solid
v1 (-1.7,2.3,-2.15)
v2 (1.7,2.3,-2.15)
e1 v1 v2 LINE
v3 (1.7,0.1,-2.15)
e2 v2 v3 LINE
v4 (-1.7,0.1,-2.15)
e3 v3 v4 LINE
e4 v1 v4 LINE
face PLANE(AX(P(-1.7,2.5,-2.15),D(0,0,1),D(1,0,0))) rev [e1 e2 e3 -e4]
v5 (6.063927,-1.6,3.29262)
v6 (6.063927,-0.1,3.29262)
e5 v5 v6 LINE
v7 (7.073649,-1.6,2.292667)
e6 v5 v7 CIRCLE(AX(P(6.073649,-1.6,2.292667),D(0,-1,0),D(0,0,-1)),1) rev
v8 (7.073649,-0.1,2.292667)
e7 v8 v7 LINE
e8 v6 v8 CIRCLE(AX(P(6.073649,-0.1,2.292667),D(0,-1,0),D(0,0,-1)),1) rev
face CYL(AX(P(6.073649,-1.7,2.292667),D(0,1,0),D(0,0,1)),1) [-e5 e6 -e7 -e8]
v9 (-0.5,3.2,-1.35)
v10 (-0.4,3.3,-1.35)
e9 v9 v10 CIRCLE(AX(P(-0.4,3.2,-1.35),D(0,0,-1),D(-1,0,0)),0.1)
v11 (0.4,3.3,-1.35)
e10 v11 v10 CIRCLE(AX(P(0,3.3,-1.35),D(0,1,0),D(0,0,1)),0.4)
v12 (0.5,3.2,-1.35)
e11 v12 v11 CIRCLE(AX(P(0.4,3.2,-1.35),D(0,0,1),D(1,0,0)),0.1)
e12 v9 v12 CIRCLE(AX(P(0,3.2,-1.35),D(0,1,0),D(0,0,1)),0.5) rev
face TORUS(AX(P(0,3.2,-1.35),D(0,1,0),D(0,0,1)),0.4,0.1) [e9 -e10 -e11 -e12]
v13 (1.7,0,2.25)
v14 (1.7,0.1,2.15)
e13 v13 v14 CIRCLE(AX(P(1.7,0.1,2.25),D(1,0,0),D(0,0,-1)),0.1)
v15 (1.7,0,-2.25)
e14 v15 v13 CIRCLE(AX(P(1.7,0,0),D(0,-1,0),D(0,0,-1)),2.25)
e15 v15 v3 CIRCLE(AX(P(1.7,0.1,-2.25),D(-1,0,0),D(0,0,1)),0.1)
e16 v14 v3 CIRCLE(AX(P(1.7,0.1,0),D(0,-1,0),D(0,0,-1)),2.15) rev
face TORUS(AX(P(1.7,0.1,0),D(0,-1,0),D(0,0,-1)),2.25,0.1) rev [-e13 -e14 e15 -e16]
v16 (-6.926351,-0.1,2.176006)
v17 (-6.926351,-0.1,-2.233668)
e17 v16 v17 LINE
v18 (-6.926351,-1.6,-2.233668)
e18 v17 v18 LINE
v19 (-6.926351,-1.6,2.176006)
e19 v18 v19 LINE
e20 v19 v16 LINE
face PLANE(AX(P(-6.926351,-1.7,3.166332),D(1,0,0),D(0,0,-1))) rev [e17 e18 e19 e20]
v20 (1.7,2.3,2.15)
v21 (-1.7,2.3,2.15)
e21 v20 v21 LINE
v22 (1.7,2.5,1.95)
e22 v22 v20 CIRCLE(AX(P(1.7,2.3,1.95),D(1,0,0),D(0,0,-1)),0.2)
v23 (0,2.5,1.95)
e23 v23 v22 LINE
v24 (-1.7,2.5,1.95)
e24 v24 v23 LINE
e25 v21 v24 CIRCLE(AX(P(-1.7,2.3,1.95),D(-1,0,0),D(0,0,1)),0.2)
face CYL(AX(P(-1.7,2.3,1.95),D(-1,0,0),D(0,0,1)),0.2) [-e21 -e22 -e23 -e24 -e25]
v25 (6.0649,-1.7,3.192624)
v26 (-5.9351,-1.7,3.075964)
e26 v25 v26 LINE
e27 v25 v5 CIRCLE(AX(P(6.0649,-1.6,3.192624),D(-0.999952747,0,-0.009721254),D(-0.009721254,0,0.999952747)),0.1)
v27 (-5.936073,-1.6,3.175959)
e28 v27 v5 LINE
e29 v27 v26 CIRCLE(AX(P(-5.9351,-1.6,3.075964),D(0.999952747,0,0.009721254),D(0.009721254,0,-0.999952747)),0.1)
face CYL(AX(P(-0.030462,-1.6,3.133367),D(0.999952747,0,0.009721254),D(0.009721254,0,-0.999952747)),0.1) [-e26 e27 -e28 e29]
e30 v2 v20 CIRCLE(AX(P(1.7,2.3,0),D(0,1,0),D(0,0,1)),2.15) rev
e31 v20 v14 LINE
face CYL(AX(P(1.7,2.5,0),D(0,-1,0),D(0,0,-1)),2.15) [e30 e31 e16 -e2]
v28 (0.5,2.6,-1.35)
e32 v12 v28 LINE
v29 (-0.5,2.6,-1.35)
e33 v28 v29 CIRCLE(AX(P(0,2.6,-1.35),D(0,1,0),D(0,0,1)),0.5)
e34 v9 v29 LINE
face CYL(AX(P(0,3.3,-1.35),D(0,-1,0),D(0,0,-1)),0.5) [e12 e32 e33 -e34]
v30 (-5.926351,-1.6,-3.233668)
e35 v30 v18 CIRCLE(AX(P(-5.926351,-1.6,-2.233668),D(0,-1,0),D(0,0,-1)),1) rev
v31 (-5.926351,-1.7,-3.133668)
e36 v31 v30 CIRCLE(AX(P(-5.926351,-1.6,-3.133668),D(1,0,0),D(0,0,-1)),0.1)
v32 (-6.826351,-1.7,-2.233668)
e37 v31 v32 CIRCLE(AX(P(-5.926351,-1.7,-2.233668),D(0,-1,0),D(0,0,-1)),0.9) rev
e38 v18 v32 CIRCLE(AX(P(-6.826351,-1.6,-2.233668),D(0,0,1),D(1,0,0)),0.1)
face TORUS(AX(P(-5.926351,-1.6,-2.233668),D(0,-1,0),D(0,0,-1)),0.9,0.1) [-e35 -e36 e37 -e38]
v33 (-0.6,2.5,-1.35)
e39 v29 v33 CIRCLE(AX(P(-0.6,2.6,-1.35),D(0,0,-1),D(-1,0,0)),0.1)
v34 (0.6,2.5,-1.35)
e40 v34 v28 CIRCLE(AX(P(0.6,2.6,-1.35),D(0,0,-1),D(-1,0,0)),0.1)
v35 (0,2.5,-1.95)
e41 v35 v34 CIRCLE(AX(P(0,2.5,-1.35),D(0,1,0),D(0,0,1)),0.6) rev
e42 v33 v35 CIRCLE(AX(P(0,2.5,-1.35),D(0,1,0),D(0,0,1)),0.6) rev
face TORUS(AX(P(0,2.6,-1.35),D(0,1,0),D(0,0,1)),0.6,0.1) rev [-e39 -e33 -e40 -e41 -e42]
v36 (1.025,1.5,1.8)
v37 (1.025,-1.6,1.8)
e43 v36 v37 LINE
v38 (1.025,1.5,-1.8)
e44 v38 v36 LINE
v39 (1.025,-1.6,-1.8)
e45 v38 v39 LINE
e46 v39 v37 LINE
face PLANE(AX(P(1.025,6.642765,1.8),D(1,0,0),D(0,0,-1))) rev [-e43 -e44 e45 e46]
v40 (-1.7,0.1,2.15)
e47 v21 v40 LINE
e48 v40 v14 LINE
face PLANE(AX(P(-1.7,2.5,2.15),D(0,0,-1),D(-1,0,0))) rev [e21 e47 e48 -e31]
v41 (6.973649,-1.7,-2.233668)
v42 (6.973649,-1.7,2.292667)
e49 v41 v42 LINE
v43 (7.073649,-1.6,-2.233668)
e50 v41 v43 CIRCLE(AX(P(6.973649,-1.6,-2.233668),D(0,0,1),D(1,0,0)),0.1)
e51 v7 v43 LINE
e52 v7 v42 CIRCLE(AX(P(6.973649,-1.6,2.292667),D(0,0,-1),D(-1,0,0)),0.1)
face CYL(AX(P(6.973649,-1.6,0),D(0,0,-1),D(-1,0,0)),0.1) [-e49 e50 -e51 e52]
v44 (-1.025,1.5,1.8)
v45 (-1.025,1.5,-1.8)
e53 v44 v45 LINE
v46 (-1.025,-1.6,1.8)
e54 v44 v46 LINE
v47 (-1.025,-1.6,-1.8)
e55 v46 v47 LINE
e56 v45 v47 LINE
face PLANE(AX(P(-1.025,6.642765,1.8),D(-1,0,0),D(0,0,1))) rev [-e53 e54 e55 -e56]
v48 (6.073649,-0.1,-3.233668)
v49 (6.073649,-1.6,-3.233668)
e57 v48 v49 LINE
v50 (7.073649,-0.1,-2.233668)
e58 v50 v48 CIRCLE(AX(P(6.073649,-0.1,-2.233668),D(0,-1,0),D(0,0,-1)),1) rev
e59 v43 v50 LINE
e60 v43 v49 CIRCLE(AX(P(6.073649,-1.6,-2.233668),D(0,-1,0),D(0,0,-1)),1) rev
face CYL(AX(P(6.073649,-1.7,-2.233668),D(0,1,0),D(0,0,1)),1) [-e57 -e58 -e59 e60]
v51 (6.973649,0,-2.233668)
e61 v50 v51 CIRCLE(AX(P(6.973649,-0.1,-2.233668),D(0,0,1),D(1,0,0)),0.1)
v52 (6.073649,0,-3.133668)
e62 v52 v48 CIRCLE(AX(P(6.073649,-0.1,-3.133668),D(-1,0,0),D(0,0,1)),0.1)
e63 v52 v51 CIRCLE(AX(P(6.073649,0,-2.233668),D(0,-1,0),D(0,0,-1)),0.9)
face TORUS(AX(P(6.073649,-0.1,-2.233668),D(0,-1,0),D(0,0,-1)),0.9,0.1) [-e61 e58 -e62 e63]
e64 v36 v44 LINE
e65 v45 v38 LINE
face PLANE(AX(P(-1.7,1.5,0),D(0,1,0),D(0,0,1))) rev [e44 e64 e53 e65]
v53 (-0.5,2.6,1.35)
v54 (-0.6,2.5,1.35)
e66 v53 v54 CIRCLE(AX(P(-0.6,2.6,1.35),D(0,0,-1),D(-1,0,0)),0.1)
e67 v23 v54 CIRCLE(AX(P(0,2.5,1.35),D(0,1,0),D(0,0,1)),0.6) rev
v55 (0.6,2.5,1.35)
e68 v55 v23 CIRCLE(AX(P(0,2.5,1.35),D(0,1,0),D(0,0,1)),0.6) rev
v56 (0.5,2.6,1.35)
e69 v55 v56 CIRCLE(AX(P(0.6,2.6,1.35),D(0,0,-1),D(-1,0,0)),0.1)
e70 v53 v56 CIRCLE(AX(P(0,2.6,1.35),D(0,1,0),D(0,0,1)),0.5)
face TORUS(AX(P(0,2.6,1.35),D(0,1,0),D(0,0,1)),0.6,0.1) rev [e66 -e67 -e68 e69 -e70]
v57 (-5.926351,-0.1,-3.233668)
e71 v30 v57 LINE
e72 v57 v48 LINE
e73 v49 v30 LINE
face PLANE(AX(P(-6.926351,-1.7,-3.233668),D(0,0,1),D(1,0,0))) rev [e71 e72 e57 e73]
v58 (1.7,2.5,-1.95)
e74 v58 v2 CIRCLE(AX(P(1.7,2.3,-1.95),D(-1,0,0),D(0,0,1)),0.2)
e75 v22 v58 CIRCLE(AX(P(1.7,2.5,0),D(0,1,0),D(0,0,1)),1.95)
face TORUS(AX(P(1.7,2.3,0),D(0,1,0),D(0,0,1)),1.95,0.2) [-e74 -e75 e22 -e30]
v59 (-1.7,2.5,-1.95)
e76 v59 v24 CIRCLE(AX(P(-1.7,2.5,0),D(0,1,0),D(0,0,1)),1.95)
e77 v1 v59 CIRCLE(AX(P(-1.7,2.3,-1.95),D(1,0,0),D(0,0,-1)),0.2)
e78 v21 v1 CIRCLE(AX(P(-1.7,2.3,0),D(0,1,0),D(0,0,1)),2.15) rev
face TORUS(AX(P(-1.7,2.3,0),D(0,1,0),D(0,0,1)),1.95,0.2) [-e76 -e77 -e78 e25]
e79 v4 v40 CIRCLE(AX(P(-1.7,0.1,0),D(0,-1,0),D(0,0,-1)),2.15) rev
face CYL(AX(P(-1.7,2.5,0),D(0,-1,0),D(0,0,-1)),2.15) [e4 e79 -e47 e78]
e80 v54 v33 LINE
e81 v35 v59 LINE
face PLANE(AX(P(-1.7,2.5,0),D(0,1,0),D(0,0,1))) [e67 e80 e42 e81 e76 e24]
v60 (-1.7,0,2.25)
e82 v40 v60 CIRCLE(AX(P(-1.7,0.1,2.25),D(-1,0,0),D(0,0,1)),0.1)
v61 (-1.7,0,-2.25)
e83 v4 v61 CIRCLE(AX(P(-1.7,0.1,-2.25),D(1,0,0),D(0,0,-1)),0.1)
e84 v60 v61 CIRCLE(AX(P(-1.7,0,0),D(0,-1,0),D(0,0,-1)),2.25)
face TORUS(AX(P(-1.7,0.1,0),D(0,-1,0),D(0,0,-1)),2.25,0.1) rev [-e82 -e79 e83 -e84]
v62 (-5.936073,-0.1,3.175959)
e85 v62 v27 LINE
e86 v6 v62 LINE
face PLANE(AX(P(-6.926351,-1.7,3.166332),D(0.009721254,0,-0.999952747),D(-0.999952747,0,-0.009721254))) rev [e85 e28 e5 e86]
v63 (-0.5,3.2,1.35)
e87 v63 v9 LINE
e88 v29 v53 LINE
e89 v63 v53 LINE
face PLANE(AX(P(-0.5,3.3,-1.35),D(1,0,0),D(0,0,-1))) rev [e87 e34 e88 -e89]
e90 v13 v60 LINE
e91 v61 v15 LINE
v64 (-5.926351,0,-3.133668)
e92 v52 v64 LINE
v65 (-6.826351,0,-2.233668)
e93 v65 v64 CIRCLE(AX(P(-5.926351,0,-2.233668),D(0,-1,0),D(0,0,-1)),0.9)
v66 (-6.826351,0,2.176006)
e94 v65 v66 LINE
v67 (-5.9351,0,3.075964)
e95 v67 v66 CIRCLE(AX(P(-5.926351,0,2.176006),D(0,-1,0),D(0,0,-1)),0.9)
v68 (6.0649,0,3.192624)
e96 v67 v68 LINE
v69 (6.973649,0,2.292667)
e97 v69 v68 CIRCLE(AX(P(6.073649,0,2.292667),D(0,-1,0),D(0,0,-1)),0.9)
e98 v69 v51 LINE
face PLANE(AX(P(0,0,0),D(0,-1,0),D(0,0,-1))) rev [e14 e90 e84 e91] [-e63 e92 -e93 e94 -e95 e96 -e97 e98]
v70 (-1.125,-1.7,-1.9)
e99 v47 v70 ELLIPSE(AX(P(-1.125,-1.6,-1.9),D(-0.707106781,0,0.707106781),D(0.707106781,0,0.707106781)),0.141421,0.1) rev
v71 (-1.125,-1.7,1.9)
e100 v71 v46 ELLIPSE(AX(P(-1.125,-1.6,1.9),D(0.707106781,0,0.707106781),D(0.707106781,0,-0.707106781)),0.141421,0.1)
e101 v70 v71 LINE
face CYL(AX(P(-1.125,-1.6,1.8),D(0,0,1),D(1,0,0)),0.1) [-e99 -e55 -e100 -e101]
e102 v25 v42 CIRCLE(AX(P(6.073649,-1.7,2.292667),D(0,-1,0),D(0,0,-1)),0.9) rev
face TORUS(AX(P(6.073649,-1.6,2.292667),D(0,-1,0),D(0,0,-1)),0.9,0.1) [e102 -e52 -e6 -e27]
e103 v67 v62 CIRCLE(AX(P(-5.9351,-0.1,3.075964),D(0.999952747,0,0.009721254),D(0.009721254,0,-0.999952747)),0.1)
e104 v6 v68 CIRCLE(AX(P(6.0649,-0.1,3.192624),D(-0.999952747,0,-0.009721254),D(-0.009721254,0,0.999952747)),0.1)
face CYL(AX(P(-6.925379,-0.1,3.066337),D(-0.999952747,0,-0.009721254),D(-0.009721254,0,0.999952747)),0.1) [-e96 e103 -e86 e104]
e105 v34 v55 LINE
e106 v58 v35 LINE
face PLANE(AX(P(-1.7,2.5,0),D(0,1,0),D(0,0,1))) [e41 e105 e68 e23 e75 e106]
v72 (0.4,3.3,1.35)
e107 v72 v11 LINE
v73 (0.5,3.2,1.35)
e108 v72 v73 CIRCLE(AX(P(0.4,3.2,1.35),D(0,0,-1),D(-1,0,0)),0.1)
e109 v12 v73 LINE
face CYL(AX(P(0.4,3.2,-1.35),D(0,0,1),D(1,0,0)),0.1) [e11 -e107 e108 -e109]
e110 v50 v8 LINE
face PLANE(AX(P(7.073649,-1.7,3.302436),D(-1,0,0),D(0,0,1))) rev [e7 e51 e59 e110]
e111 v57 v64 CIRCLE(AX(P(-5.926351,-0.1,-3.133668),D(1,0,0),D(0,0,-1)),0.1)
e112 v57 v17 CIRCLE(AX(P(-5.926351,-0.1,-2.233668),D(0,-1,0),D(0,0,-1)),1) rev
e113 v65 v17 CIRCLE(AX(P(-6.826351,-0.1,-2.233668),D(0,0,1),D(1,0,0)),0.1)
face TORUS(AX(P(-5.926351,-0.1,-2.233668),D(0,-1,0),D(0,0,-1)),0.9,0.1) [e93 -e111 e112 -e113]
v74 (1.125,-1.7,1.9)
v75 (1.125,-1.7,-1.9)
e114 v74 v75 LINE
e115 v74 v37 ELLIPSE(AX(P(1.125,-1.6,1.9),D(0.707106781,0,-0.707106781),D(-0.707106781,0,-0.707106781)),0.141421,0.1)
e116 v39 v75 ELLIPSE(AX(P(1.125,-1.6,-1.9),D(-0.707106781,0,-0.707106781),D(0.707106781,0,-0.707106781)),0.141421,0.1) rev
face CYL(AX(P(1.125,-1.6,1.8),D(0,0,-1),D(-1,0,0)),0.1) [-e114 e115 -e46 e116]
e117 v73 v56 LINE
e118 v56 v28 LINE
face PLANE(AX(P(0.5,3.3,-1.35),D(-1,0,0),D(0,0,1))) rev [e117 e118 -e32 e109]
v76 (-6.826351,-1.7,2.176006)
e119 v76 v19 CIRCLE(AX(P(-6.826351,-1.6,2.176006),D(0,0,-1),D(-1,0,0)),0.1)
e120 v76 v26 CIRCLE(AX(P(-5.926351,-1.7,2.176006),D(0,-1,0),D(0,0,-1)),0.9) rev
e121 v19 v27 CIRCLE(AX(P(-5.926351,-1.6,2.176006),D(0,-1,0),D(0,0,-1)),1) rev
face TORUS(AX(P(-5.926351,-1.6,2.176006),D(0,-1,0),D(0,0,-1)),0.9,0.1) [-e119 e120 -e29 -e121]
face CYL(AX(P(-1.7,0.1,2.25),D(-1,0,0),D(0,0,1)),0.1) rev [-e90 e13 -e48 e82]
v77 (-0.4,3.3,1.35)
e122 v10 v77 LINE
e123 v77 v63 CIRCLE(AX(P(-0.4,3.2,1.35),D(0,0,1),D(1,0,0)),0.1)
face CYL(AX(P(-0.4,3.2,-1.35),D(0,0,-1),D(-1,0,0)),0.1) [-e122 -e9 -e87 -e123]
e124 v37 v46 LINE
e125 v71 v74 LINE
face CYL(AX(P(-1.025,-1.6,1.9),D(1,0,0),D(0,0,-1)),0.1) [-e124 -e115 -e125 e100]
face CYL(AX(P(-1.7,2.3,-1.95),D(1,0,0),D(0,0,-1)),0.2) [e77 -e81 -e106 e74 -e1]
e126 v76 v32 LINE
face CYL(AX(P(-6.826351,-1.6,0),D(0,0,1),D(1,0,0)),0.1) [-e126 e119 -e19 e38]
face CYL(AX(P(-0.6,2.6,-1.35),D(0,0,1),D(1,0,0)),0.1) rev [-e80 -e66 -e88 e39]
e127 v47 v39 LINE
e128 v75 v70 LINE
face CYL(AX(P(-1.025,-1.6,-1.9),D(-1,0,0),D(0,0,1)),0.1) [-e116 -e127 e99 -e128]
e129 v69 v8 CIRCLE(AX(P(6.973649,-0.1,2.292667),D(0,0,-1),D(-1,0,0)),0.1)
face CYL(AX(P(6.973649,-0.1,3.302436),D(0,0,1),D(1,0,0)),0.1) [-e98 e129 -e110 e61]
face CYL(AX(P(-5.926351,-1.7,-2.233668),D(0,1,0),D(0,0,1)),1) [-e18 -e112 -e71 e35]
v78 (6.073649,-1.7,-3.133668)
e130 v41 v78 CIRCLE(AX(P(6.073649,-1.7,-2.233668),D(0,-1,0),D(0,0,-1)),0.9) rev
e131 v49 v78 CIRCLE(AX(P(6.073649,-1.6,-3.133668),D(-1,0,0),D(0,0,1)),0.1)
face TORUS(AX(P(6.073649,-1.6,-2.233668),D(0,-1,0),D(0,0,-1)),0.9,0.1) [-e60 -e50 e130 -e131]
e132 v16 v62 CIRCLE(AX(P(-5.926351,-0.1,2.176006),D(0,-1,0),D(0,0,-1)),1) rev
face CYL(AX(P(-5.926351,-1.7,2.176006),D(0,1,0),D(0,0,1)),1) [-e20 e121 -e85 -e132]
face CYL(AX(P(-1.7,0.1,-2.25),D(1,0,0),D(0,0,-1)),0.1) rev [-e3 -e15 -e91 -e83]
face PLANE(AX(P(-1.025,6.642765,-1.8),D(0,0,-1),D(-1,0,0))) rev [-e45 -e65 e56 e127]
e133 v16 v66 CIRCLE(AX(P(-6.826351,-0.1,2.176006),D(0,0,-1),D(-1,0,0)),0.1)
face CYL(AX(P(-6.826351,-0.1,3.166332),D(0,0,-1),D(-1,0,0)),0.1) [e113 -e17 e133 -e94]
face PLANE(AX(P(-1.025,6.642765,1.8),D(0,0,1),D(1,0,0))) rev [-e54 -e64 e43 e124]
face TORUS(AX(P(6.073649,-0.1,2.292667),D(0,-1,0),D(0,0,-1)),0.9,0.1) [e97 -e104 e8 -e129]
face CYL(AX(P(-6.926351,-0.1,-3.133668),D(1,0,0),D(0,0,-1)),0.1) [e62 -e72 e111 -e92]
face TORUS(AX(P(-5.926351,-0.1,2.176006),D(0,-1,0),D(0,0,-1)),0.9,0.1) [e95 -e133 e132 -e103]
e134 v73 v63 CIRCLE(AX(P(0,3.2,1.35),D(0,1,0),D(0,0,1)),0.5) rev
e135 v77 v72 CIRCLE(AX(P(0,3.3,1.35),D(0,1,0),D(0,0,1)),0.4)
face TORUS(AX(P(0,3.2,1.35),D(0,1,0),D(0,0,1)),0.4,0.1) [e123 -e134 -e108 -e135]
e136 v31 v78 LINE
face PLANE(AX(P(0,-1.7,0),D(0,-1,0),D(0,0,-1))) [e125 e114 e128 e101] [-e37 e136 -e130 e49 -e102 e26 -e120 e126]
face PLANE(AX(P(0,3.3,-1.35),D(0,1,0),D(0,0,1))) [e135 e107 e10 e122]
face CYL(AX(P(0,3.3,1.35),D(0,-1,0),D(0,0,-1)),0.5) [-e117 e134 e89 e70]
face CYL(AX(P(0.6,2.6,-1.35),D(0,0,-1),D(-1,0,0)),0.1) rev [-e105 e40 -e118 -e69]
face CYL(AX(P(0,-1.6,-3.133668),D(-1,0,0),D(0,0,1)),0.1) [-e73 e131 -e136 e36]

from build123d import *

# Parameters (mm, degrees)
EXTRUDE_1_DEPTH     = 2.5
FILLET_1_R          = 0.2
EXTRUDE_2_DEPTH     = 0.8
FILLET_2_R          = 0.1
EXTRUDE_3_DEPTH     = 1.7
FILLET_3_R          = 0.1
FILLET_4_R          = 1
CUT_EXTRUDE_1_DEPTH = 3.2
FILLET_5_R          = 0.1
FILLET_6_R          = 0.1


with BuildPart() as part:
    # 草图1 → 凸台-拉伸1 (new body)
    with BuildSketch(Plane(origin=(0, 0, 0), x_dir=(1, 0, 0), z_dir=(0, 1, 0))):
        with BuildLine():
            Line((-1.6999999999999993, 2.1499999999999995), (1.6999999999999993, 2.1499999999999995))
            ThreePointArc((1.6999999999999993, 2.1499999999999995), (3.8499999999999996, 3.1e-16), (1.6999999999999993, -2.1499999999999995))
            Line((1.6999999999999993, -2.1499999999999995), (-1.6999999999999993, -2.1499999999999995))
            ThreePointArc((-1.6999999999999993, -2.1499999999999995), (-3.8499999999999996, -9e-17), (-1.6999999999999993, 2.1499999999999995))
        make_face()
    extrude(amount=EXTRUDE_1_DEPTH)

    # 圆角1
    fillet_1_edges = [part.edges().sort_by_distance(p)[0] for p in [
        (3.8499999999999996, 2.5, 5e-17),
        (0, 2.5, -2.1499999999999995),
        (-3.8499999999999996, 2.5, 7e-17),
        (0, 2.5, 2.1499999999999995),
    ]]
    fillet(fillet_1_edges, radius=FILLET_1_R)

    # 草图2 → 凸台-拉伸2 (add)
    with BuildSketch(Plane(origin=(0, 2.5, 0), x_dir=(1, 0, 0), z_dir=(0, 1, 0))):
        with BuildLine():
            Line((0.5, 1.3499999999999992), (0.5, -1.3499999999999992))
            ThreePointArc((0.5, -1.3499999999999992), (-9e-17, -1.8499999999999992), (-0.5, -1.3499999999999992))
            Line((-0.5, -1.3499999999999992), (-0.5, 1.3499999999999992))
            ThreePointArc((-0.5, 1.3499999999999992), (3e-17, 1.8499999999999992), (0.5, 1.3499999999999992))
        make_face()
    extrude(amount=EXTRUDE_2_DEPTH)

    # 圆角2
    fillet_2_edges = [part.edges().sort_by_distance(p)[0] for p in [
        (-2e-17, 3.3, -1.8499999999999992),
        (-0.5, 3.3, 0),
        (0, 3.3, 1.8499999999999992),
        (0.5, 3.3, 0),
    ]]
    fillet(fillet_2_edges, radius=FILLET_2_R)

    # 草图3 → 凸台-拉伸3 (add)
    with BuildSketch(Plane.XZ):
        Polygon((-6.926351251636018, 3.166332000747894), (-6.926351251636018, -3.2336679992521065), (7.073648748363982, -3.2336679992521065), (7.07364874836398, 3.302435981734463), align=None)
    extrude(amount=EXTRUDE_3_DEPTH)

    # 圆角3
    fillet_3_edges = [part.edges().sort_by_distance(p)[0] for p in [
        (0, 0, -2.1499999999999995),
        (7.073648748363981, 0, 0.03438399124117808),
        (0.07364874836398094, 0, 3.2343839912411783),
        (3.8499999999999996, 0, 5e-17),
        (-6.926351251636018, 0, -0.03366799925210628),
        (0.07364874836398183, 0, -3.2336679992521065),
        (7.073648748363981, -1.7, 0.03438399124117808),
        (0.07364874836398094, -1.7, 3.2343839912411783),
        (-6.926351251636018, -1.7, -0.03366799925210628),
        (0.07364874836398183, -1.7, -3.2336679992521065),
        (0, 0, 2.1499999999999995),
        (-3.8499999999999996, 0, 7e-17),
    ]]
    fillet(fillet_3_edges, radius=FILLET_3_R)

    # 圆角4
    # the kernel refuses this fillet: 1 mm, written as the material it takes off along each edge
    with BuildSketch(Plane(origin=(6.073648748363982, 0, -2.2336679992521065), x_dir=(1, 0, 2.7e-16), z_dir=(-2.7e-16, 0, 1))) as fillet_4_piece_1:
        with BuildLine():
            CenterArc((0.9, -0.1), 0.1, 0, 90)
            Line((1, -0.1), (1, 0))
            Line((1, 0), (0.9, 0))
        make_face()
    revolve(axis=Axis((6.073648748363982, 0, -2.2336679992521065), (0, 1, 0)), revolution_arc=90.00000000000001, mode=Mode.SUBTRACT)
    with BuildSketch(Plane(origin=(-5.926351251636018, 0, -2.2336679992521065), x_dir=(0, 0, -1), z_dir=(1, 0, 0))) as fillet_4_piece_2:
        with BuildLine():
            CenterArc((0.9, -0.1), 0.1, 0, 90)
            Line((1, -0.1), (1, 0))
            Line((1, 0), (0.9, 0))
        make_face()
    revolve(axis=Axis((-5.926351251636018, 0, -2.2336679992521065), (0, 1, 0)), revolution_arc=90, mode=Mode.SUBTRACT)
    with BuildSketch(Plane(origin=(6.073648748363981, 0, 2.2926670140722325), x_dir=(-0.00972125355235531, 0, 0.999952747498286), z_dir=(-0.999952747498286, 0, -0.00972125355235531))) as fillet_4_piece_3:
        with BuildLine():
            CenterArc((0.9, -0.1), 0.1, 0, 90)
            Line((1, -0.1), (1, 0))
            Line((1, 0), (0.9, 0))
        make_face()
    revolve(axis=Axis((6.073648748363981, 0, 2.2926670140722325), (0, 1, 0)), revolution_arc=90.5569955732989, mode=Mode.SUBTRACT)
    with BuildSketch(Plane(origin=(-5.926351251636018, 0, 2.1760064589408876), x_dir=(-1, 0, 0), z_dir=(0, 0, -1))) as fillet_4_piece_4:
        with BuildLine():
            CenterArc((0.9, -0.1), 0.1, 0, 90)
            Line((1, -0.1), (1, 0))
            Line((1, 0), (0.9, 0))
        make_face()
    revolve(axis=Axis((-5.926351251636018, 0, 2.1760064589408876), (0, 1, 0)), revolution_arc=89.44300442670108, mode=Mode.SUBTRACT)
    with BuildSketch(Plane(origin=(-5.926351251636018, -1.7, 2.1760064589408876), x_dir=(-0.00972125355235531, 0, 0.999952747498286), z_dir=(0.999952747498286, 0, 0.00972125355235531))) as fillet_4_piece_5:
        with BuildLine():
            CenterArc((0.9, -0.1), 0.1, 0, 90)
            Line((1, -0.1), (1, 0))
            Line((1, 0), (0.9, 0))
        make_face()
    revolve(axis=Axis((-5.926351251636018, -1.7, 2.1760064589408876), (0, -1, 0)), revolution_arc=89.44300442670108, mode=Mode.SUBTRACT)
    with BuildSketch(Plane(origin=(6.073648748363981, -1.7, 2.2926670140722325), x_dir=(1, 0, 2.7e-16), z_dir=(2.7e-16, 0, -1))) as fillet_4_piece_6:
        with BuildLine():
            CenterArc((0.9, -0.1), 0.1, 0, 90)
            Line((1, -0.1), (1, 0))
            Line((1, 0), (0.9, 0))
        make_face()
    revolve(axis=Axis((6.073648748363981, -1.7, 2.2926670140722325), (0, -1, 0)), revolution_arc=90.5569955732989, mode=Mode.SUBTRACT)
    with BuildSketch(Plane(origin=(-5.926351251636018, -1.7, -2.2336679992521065), x_dir=(-1, 0, 0), z_dir=(0, 0, 1))) as fillet_4_piece_7:
        with BuildLine():
            CenterArc((0.9, -0.1), 0.1, 0, 90)
            Line((1, -0.1), (1, 0))
            Line((1, 0), (0.9, 0))
        make_face()
    revolve(axis=Axis((-5.926351251636018, -1.7, -2.2336679992521065), (0, -1, 0)), revolution_arc=90, mode=Mode.SUBTRACT)
    with BuildSketch(Plane(origin=(6.073648748363982, -1.7, -2.2336679992521065), x_dir=(0, 0, -1), z_dir=(-1, 0, 0))) as fillet_4_piece_8:
        with BuildLine():
            CenterArc((0.9, -0.1), 0.1, 0, 90)
            Line((1, -0.1), (1, 0))
            Line((1, 0), (0.9, 0))
        make_face()
    revolve(axis=Axis((6.073648748363982, -1.7, -2.2336679992521065), (0, -1, 0)), revolution_arc=90.00000000000001, mode=Mode.SUBTRACT)
    with BuildSketch(Plane(origin=(-6.926351251636018, 2.17089e-12, 3.166332000747894), x_dir=(0, 0, -1), z_dir=(0, -1, 0))) as fillet_4_piece_9:
        with BuildLine():
            CenterArc((FILLET_4_R * 0.990325541807, FILLET_4_R), FILLET_4_R, 180.556995573299, 89.44300442670101)
            Line((-FILLET_4_R * 0.00962720569128, FILLET_4_R * 0.990278746448), (0, 0))
            Line((0, 0), (FILLET_4_R * 0.990325541807, 0))
        make_face()
    extrude(amount=1.7000000000000002, mode=Mode.SUBTRACT)
    with BuildSketch(Plane(origin=(7.07364874836398, 2.1709e-12, 3.302435981734463), x_dir=(-0.9999527474982859, 0, -0.009721253552355385), z_dir=(0, -1, 0))) as fillet_4_piece_10:
        with BuildLine():
            CenterArc((FILLET_4_R * 1.00976896766, FILLET_4_R), FILLET_4_R, 179.4430044267011, 90.55699557329888)
            Line((FILLET_4_R * 0.00981622016394, FILLET_4_R * 1.00972125355), (0, 0))
            Line((0, 0), (FILLET_4_R * 1.00976896766, 0))
        make_face()
    extrude(amount=1.6999999999999997, mode=Mode.SUBTRACT)
    with BuildSketch(Plane(origin=(-6.926351251636018, 2.1709e-12, -3.2336679992521065), x_dir=(0, 0, 1), z_dir=(0, -1, 0))) as fillet_4_piece_11:
        with BuildLine():
            CenterArc((FILLET_4_R, -FILLET_4_R), FILLET_4_R, 90, 90)
            Line((0, -FILLET_4_R), (0, 0))
            Line((0, 0), (FILLET_4_R, 0))
        make_face()
    extrude(amount=1.6999999999999997, mode=Mode.SUBTRACT)
    with BuildSketch(Plane(origin=(7.073648748363982, 2.1709e-12, -3.2336679992521065), x_dir=(-1, 0, 0), z_dir=(0, -1, 0))) as fillet_4_piece_12:
        with BuildLine():
            CenterArc((FILLET_4_R, -FILLET_4_R), FILLET_4_R, 90, 90)
            Line((0, -FILLET_4_R), (0, 0))
            Line((0, 0), (FILLET_4_R, 0))
        make_face()
    extrude(amount=1.6999999999999997, mode=Mode.SUBTRACT)

    # 草图5 → 切除-拉伸1 (cut)
    with BuildSketch(Plane.XZ.offset(1.7)):
        Polygon((-1.0250000000000004, 1.8), (1.0249999999999997, 1.8000000000000003), (1.0250000000000001, -1.7999999999999998), (-1.0249999999999997, -1.7999999999999998), align=None)
    extrude(amount=-CUT_EXTRUDE_1_DEPTH, mode=Mode.SUBTRACT)

    # 圆角5
    fillet_5_edges = [part.edges().sort_by_distance(p)[0] for p in [
        (1.025, -1.7, 2.2e-16),
        (-4.4e-16, -1.7, 1.8000000000000003),
        (-1.025, -1.7, 0),
        (2.2e-16, -1.7, -1.7999999999999998),
    ]]
    fillet(fillet_5_edges, radius=FILLET_5_R)

    # 圆角6
    fillet_6_edges = [part.edges().sort_by_distance(p)[0] for p in [
        (0.5, 2.5, 0),
        (0, 2.5, 1.8499999999999992),
        (-0.5, 2.5, 0),
        (-2e-17, 2.5, -1.8499999999999992),
    ]]
    fillet(fillet_6_edges, radius=FILLET_6_R)


solid = part.part
